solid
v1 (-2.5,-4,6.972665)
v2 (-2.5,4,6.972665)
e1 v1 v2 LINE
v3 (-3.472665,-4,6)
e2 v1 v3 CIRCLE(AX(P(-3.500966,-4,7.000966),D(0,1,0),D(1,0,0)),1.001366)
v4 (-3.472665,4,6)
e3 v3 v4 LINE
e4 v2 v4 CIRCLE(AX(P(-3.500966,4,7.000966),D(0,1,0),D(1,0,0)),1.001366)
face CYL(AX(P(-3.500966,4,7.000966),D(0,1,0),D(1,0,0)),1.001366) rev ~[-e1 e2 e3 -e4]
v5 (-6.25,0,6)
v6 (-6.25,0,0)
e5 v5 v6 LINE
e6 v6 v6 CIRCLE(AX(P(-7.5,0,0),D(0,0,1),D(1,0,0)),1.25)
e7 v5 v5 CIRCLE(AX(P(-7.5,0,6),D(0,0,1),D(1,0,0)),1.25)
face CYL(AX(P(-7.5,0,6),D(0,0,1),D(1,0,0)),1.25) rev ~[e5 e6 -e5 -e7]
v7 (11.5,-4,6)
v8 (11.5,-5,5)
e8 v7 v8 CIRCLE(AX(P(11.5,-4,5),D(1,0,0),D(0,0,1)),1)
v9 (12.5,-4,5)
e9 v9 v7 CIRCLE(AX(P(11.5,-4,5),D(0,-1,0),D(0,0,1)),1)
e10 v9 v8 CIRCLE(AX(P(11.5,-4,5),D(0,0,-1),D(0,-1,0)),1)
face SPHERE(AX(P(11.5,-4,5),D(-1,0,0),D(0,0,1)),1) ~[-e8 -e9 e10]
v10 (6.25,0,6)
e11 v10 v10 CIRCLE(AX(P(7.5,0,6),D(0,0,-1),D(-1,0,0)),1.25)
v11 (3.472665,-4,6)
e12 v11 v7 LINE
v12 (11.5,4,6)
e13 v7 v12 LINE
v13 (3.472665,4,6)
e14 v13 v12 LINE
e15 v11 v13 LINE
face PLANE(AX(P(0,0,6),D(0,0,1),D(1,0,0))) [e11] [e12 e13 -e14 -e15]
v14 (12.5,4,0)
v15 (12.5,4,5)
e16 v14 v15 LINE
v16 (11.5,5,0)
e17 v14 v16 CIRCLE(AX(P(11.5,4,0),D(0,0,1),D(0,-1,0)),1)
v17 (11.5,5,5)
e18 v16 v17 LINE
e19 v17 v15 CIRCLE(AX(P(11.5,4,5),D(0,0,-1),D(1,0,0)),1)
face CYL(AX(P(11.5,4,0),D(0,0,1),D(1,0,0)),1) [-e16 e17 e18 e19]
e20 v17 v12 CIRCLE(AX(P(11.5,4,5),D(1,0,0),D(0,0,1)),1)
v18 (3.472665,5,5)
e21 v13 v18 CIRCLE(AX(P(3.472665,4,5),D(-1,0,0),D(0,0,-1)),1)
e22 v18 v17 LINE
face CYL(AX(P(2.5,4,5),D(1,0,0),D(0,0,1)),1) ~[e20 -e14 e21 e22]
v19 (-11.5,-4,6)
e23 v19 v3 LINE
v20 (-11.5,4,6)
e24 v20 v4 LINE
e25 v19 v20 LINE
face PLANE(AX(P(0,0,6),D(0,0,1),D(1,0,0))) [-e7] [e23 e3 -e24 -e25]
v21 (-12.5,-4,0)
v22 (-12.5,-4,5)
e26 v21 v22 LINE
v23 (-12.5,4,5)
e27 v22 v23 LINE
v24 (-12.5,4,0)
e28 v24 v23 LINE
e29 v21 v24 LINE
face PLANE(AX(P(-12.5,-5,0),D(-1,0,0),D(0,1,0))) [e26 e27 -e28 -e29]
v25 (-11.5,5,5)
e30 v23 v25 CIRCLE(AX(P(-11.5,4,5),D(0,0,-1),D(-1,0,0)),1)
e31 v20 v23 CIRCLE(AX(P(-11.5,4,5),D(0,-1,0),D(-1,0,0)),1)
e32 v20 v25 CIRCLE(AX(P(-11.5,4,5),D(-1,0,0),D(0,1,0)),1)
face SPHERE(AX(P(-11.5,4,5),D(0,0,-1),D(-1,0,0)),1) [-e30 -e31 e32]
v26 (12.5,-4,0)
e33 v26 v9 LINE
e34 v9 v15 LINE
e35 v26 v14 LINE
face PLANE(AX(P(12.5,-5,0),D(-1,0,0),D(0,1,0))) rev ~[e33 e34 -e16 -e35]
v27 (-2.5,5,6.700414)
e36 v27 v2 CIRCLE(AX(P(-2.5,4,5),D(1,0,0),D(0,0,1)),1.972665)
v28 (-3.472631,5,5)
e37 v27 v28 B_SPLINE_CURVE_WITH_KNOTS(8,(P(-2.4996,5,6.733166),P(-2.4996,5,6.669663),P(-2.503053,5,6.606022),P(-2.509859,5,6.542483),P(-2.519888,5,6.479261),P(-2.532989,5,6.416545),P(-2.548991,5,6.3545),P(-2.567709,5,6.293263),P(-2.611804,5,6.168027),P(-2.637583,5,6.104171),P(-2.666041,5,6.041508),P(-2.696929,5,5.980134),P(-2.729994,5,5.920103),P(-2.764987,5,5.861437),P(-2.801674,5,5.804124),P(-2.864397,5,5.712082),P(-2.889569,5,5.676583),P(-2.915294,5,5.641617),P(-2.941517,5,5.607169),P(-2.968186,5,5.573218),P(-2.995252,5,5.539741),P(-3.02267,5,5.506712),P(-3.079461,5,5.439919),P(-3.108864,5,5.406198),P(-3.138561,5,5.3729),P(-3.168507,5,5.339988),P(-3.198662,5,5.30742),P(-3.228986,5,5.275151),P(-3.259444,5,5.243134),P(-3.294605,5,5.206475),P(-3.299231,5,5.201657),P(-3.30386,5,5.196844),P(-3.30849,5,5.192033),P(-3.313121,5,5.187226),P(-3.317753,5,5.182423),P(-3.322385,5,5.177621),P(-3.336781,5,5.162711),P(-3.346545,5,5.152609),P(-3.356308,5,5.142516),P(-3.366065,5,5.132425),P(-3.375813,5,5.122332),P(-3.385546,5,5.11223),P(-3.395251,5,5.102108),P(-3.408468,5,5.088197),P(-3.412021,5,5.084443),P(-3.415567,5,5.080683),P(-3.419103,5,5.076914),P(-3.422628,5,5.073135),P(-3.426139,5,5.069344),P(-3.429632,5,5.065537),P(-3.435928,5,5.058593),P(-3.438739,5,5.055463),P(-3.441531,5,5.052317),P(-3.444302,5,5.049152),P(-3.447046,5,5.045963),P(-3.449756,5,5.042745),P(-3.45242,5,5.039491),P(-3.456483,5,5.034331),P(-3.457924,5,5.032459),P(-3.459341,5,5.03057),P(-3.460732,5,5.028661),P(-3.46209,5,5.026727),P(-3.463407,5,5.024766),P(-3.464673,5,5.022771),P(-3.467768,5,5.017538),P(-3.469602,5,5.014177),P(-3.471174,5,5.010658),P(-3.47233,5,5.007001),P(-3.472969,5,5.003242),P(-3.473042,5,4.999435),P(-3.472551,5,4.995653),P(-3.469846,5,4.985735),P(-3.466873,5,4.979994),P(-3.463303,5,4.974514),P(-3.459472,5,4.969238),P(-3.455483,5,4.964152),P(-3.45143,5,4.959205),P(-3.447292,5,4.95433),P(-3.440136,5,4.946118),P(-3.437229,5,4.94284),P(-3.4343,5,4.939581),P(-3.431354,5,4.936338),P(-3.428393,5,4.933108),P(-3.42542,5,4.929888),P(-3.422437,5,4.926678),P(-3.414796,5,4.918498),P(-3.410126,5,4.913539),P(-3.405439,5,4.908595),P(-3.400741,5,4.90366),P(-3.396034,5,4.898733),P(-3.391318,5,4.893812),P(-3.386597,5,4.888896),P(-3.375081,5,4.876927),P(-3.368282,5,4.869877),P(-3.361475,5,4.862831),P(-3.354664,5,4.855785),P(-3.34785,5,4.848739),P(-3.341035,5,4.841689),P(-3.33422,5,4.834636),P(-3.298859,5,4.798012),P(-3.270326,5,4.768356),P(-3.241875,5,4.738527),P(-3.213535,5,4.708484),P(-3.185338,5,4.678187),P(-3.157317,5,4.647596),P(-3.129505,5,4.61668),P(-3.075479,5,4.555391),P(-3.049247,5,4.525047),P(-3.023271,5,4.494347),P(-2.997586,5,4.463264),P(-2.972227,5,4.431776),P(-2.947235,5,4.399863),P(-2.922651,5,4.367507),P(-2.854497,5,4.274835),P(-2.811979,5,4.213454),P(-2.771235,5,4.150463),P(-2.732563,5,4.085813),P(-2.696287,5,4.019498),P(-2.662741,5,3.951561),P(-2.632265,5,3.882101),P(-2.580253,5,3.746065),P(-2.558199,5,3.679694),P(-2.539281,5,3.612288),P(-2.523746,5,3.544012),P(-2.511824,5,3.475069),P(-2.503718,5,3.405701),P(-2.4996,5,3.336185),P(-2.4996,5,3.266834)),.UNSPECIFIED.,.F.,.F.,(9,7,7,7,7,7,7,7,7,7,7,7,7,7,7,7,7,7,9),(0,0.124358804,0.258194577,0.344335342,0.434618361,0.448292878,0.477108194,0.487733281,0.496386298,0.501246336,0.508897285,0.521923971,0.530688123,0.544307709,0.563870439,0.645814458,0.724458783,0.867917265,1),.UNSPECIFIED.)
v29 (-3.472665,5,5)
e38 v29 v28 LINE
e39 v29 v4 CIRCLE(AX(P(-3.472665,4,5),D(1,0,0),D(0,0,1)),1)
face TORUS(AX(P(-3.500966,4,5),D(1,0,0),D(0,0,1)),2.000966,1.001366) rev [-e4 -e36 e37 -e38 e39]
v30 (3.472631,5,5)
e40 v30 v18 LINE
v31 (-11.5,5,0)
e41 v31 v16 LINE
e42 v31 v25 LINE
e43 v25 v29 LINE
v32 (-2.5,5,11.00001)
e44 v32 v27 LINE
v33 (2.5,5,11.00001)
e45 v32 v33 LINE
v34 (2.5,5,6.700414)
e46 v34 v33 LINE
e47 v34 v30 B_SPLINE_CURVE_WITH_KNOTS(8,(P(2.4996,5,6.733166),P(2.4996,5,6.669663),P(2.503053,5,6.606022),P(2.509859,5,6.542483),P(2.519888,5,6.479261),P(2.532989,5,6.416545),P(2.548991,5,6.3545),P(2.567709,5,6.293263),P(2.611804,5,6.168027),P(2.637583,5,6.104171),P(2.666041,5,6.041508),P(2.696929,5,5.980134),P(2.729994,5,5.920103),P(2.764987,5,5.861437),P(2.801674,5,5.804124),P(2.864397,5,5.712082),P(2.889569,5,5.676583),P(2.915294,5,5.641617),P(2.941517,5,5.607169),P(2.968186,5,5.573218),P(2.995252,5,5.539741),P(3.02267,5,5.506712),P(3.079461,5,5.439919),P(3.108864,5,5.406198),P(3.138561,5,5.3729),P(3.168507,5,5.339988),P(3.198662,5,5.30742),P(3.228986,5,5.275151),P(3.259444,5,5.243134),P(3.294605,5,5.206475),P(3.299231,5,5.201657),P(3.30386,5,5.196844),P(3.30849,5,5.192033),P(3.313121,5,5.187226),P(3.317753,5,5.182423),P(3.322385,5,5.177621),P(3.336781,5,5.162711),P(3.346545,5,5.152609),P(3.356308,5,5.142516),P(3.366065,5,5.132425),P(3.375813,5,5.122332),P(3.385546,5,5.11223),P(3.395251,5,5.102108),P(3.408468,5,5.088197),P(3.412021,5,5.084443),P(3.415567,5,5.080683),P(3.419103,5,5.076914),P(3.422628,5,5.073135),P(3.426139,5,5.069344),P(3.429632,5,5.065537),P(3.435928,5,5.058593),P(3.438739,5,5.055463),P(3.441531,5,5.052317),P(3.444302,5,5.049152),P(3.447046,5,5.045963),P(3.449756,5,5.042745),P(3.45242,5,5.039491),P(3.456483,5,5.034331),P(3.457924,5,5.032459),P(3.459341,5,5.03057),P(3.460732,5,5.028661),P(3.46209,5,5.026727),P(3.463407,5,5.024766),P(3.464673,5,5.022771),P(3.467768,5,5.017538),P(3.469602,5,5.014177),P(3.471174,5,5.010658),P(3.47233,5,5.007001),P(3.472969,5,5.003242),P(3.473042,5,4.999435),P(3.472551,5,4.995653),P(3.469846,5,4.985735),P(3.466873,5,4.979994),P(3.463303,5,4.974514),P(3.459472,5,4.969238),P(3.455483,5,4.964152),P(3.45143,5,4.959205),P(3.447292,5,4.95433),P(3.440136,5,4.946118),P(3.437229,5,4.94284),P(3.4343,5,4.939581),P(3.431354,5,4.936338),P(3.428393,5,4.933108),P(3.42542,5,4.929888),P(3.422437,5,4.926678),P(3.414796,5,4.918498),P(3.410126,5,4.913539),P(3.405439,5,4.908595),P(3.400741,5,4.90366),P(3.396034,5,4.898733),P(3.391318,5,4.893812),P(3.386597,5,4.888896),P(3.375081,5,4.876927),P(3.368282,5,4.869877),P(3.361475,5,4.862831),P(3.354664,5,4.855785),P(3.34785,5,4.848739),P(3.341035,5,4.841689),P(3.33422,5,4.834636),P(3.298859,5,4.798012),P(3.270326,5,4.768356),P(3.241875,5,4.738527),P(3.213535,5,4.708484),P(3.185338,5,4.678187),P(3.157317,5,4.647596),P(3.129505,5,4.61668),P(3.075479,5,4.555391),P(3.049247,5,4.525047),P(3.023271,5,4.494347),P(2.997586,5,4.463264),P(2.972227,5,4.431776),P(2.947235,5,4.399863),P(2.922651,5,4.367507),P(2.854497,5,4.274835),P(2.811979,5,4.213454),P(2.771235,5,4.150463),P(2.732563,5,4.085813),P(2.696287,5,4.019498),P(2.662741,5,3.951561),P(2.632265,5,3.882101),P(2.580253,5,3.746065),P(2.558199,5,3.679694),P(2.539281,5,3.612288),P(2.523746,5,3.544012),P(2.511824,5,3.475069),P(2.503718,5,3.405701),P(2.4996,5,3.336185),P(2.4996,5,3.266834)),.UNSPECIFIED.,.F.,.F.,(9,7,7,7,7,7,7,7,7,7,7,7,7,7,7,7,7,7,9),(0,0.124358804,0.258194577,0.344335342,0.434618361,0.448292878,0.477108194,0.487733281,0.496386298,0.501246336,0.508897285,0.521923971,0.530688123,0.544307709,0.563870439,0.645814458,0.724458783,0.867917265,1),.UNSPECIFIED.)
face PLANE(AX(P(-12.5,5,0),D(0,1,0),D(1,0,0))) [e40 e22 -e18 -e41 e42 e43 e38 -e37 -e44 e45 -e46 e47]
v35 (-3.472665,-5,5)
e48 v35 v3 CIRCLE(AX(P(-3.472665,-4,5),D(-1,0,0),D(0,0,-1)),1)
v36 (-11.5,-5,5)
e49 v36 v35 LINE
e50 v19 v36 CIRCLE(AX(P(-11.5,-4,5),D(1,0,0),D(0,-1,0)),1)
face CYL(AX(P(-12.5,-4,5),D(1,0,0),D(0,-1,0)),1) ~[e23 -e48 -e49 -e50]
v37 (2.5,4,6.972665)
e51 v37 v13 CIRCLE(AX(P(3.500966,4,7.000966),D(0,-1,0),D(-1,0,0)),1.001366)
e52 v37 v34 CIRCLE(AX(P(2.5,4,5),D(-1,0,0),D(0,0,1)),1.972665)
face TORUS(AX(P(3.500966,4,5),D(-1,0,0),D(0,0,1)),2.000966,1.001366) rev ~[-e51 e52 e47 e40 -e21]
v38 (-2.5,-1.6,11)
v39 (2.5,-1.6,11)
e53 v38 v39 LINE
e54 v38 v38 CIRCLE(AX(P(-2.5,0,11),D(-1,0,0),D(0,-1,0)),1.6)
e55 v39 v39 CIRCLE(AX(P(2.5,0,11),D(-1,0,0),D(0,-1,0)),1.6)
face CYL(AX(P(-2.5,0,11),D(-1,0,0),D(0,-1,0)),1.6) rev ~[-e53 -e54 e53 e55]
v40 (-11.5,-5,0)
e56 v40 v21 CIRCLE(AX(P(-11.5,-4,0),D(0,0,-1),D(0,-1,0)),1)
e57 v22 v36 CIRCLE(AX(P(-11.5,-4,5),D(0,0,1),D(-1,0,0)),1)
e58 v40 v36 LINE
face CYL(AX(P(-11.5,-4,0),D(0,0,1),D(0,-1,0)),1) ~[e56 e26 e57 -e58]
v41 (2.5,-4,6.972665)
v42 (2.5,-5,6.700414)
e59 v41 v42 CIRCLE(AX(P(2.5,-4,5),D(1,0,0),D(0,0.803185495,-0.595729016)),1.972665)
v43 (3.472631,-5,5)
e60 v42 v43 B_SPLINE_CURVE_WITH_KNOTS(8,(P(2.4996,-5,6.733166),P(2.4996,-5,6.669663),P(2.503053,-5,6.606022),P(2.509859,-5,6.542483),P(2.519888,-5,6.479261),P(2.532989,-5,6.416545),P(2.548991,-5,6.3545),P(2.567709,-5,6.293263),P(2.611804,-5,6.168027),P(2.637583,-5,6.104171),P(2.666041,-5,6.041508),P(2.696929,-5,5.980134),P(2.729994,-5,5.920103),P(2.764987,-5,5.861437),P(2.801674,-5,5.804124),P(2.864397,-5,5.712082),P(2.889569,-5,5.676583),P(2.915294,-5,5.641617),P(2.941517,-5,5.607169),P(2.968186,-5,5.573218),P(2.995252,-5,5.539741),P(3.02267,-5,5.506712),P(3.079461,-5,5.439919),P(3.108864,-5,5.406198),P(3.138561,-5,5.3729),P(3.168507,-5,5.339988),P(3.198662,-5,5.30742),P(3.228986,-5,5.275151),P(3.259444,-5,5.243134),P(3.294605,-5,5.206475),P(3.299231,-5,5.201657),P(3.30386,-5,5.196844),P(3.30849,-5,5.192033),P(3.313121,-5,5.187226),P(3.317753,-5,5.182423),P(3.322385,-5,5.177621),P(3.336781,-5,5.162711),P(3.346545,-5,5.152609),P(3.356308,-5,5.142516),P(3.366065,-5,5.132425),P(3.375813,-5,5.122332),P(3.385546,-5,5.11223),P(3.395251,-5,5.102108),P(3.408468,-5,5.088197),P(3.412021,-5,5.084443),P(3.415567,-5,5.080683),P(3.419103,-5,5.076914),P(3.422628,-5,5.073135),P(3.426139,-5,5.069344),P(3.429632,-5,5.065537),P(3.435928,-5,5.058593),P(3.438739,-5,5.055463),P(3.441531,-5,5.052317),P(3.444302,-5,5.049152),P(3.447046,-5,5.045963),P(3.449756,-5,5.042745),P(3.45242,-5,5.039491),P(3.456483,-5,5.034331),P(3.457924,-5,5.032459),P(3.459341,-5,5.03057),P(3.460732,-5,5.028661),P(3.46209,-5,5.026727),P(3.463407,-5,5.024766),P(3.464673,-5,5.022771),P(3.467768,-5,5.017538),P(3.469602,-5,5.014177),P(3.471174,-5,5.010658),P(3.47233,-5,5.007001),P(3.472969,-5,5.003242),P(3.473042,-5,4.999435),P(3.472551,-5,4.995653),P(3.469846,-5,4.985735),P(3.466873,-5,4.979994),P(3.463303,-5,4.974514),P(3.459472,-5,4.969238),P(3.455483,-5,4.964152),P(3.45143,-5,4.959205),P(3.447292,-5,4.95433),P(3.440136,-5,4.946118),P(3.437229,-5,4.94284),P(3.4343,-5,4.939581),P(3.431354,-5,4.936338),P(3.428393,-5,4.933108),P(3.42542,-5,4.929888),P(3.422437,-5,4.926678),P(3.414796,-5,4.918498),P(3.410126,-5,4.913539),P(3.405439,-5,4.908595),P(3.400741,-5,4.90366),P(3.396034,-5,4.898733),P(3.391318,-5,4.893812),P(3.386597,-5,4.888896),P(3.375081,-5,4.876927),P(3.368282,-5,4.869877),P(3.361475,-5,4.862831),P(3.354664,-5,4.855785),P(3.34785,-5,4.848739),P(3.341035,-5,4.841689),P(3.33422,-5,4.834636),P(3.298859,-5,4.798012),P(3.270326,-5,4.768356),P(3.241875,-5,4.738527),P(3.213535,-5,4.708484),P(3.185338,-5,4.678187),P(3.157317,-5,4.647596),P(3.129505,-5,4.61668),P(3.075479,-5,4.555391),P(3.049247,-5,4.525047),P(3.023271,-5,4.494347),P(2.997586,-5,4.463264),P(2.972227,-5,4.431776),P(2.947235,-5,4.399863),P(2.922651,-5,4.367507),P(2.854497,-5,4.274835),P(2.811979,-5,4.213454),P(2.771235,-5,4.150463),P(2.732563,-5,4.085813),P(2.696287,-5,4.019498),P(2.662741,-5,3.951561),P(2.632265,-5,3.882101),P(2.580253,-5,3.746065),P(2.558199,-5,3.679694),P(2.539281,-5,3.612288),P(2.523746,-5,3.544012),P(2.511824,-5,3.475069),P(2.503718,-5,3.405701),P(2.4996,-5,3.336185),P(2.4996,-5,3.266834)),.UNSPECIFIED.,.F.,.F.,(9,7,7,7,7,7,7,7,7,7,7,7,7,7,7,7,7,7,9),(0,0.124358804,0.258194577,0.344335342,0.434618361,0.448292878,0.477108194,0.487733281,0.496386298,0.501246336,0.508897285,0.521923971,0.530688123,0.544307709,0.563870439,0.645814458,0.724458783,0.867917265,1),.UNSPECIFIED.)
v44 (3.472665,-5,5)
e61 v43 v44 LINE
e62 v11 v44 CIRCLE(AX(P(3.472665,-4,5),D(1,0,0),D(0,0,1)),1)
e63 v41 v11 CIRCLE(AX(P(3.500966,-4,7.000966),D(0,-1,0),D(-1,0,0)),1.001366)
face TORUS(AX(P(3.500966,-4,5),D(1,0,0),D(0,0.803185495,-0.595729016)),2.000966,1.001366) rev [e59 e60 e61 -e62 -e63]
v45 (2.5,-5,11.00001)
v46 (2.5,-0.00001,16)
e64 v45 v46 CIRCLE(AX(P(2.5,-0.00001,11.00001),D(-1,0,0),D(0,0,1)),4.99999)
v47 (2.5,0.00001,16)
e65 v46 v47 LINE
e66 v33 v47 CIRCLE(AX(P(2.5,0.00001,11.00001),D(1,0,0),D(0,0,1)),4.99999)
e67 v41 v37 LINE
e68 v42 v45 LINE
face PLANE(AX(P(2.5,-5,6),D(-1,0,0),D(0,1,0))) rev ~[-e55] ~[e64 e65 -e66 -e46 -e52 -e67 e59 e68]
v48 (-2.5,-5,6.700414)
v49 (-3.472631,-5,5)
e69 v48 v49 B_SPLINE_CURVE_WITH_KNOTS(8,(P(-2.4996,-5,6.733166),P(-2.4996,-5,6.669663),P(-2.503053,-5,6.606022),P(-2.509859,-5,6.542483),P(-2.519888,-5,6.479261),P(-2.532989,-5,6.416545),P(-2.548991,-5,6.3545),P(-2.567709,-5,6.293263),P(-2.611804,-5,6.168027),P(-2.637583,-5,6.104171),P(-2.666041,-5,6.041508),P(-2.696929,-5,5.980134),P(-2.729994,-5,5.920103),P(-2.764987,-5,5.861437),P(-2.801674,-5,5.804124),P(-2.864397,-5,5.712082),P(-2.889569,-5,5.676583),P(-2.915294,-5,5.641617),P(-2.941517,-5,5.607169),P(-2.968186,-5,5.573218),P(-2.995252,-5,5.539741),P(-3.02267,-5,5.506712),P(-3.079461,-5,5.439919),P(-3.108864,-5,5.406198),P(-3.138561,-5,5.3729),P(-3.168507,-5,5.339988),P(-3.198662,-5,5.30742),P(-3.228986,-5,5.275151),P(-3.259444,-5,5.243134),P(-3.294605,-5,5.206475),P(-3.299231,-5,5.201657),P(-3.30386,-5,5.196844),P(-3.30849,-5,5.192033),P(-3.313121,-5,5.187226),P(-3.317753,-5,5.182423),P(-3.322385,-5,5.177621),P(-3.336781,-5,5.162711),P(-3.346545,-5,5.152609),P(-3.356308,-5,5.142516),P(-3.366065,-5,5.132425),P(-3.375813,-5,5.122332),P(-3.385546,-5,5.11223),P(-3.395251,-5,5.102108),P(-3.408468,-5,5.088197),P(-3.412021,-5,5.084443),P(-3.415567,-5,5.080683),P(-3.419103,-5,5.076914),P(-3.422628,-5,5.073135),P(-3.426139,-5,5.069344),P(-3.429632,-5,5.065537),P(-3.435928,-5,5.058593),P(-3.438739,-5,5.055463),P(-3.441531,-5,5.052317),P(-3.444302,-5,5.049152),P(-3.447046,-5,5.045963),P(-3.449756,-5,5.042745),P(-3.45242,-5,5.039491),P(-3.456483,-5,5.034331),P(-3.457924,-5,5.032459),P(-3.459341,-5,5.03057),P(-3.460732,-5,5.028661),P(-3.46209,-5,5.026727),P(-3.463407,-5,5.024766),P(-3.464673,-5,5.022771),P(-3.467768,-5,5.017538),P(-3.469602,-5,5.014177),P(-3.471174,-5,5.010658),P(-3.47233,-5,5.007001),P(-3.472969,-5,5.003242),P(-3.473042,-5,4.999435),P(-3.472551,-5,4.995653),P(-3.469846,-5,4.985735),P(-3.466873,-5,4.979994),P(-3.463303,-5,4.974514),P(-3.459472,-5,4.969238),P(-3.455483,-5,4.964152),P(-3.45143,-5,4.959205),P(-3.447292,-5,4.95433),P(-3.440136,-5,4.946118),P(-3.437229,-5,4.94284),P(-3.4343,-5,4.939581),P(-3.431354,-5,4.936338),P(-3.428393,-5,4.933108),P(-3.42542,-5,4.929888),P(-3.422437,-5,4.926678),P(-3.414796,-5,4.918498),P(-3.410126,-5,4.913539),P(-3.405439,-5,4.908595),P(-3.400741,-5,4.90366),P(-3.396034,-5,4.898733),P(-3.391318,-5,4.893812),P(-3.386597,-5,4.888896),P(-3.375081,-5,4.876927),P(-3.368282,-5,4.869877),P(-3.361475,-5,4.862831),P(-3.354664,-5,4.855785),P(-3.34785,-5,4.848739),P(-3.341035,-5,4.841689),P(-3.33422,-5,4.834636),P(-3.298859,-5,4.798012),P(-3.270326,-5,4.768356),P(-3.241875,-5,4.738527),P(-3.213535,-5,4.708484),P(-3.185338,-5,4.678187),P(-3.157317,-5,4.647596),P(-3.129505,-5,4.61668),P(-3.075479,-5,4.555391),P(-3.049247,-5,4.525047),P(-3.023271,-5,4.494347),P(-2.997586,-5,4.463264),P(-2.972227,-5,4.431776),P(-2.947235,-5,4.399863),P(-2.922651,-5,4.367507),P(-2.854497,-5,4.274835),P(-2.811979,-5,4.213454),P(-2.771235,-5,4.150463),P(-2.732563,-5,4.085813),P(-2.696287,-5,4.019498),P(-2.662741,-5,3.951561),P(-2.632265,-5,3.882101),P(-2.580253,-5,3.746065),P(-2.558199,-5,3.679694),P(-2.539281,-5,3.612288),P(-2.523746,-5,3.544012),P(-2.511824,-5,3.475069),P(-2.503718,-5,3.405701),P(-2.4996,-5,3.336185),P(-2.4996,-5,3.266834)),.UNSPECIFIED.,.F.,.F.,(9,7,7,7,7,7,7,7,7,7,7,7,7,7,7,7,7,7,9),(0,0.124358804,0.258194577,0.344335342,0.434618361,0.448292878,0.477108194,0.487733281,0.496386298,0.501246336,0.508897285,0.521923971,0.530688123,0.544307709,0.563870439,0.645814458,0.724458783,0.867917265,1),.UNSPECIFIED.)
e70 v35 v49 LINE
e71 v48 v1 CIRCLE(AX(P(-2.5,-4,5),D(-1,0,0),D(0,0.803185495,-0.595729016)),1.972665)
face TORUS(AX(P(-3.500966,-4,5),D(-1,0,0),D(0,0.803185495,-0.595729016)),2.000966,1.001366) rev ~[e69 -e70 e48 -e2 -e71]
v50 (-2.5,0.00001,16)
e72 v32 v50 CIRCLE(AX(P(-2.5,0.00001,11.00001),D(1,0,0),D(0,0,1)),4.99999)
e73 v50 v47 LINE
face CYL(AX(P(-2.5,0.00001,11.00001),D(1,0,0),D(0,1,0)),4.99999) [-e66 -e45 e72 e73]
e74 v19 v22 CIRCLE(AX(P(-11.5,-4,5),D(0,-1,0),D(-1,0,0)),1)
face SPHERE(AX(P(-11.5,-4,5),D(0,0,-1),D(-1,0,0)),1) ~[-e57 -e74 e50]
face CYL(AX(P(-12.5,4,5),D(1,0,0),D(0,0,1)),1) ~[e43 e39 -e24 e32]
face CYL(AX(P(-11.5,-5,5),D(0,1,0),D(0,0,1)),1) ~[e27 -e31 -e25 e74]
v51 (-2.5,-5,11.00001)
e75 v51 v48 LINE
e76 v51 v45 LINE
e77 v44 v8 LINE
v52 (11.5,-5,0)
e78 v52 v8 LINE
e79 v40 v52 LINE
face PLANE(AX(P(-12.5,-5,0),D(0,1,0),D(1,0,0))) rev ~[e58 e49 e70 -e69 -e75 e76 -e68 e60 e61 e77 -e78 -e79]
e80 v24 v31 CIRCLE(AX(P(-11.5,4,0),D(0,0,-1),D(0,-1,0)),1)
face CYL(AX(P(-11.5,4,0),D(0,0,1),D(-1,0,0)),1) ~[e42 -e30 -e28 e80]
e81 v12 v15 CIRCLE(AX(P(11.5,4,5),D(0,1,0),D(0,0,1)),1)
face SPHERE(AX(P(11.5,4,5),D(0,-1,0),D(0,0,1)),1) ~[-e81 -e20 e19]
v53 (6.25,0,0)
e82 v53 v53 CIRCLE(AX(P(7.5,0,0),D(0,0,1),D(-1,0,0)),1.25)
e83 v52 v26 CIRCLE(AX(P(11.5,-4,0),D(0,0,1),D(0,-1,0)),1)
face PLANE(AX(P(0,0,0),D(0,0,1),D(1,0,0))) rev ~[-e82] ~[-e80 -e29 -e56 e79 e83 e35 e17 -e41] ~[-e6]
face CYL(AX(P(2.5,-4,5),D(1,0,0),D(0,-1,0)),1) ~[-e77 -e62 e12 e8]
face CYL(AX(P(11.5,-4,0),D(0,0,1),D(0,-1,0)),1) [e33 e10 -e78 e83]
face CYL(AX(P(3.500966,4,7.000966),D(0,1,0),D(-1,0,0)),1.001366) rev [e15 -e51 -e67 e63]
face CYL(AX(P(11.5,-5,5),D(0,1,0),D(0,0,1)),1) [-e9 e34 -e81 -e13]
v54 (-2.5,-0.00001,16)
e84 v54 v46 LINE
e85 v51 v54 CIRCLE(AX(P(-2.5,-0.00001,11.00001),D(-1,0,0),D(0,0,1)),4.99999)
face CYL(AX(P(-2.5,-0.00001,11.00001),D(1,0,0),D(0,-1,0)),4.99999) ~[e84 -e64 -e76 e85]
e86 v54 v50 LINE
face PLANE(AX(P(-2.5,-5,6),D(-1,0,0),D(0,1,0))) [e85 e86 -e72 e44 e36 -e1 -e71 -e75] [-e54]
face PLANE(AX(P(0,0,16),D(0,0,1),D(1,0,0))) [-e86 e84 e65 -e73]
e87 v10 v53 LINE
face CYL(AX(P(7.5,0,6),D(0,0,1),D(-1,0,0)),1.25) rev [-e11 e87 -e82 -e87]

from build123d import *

# Parameters (mm, degrees)
F0_W          = 25
F0_H          = 10
F1_DEPTH      = 6
F2_W          = 5
F2_H          = 10
F3_DEPTH      = 10
F4_R          = 1.25
F5_DEPTH      = 6.001
F6_R          = 4.99999
F7_R          = 1.6
F8_DEPTH      = 15.001
F9_R          = 1
F10_T1_DEPTH  = 8
F10_T6_ANGLE  = 233.435380504
F10_T11_ANGLE = 233.435380504
F10_T16_ANGLE = 233.435380504
F10_T21_ANGLE = 233.435380504


# Not quite as in the source:
# - a fillet or chamfer that OpenCascade refuses, or shapes differently, is made with other operations: its cross-section is extruded or revolved along the edge and cut away or added
# - a fillet or chamfer is up to 0.001 mm smaller than in the source, because OpenCascade refuses the exact size
# - a pattern or mirror of a feature is missing from the dataset's text; its kind, count and spacing are read off the source's solid


with BuildPart() as f1:
    # F0 (on Top) → F1 (new body)
    with BuildSketch(Plane.XY):
        Rectangle(F0_W, F0_H)
    extrude(amount=F1_DEPTH)

    # F2 (on face) → F3 (join)
    with BuildSketch(Plane.XY.offset(6)):
        Rectangle(F2_W, F2_H)
    extrude(amount=F3_DEPTH)

    # F4 (on face) → F5 (cut, through all)
    with BuildSketch(Plane.XY.offset(6)):
        with Locations((-7.5, 0)):
            Circle(F4_R)
    f5 = extrude(amount=-F5_DEPTH, mode=Mode.SUBTRACT)

    # F5_copies: F5 across plane
    add(f5.mirror(Plane(origin=(0, 0, 0), x_dir=(0, 0, 1), z_dir=(1, 0, 0))), mode=Mode.SUBTRACT)

    # F6 (radius 5 in the source; OpenCascade refuses exactly that, so slightly less here)
    f6_edges = [f1.edges().sort_by_distance(p)[0] for p in [
        (0, -5, 16),
        (0, 5, 16),
    ]]
    fillet(f6_edges, radius=F6_R)

    # F7 (on face) → F8 (cut, through all)
    with BuildSketch(Plane(origin=(-2.5, 0, 0), x_dir=(0, -1, 0), z_dir=(-1, 0, 0))):
        with Locations((0, 11)):
            Circle(F7_R)
    extrude(amount=-F8_DEPTH, mode=Mode.SUBTRACT)

    # F9
    f9_edges = [f1.edges().sort_by_distance(p)[0] for p in [
        (7.5, -5, 6),
        (12.5, 0, 6),
        (7.5, 5, 6),
        (12.5, -5, 3),
        (12.5, 5, 3),
        (-12.5, -5, 3),
        (-12.5, 5, 3),
        (-12.5, 0, 6),
        (-7.5, -5, 6),
        (-7.5, 5, 6),
    ]]
    fillet(f9_edges, radius=F9_R)

    # F10: fillet of radius 1 on 2 edges, made by hand

    # F10_s2 → F10_t1 (join)
    with BuildSketch(Plane.XZ.offset(-4)):
        with BuildLine():
            ThreePointArc((2.4996, 7.0009656854), (2.7928932188, 6.2928932188), (3.5009656854, 5.9996))
            Line((3.5009656854, 5.9996), (3.5009656854, 5.8994634315))
            ThreePointArc((3.5009656854, 5.8994634315), (3.0004828427, 5.8998634315), (2.5, 5.8998634315))
            Line((2.5, 5.8998634315), (2.3998634315, 6))
            ThreePointArc((2.3998634315, 6), (2.3998634315, 6.5004828427), (2.3994634315, 7.0009656854))
            Line((2.3994634315, 7.0009656854), (2.4996, 7.0009656854))
        make_face()
        with BuildLine():
            ThreePointArc((-2.4996, 7.0009656854), (-2.7928932188, 6.2928932188), (-3.5009656854, 5.9996))
            Line((-3.5009656854, 5.9996), (-3.5009656854, 5.8994634315))
            ThreePointArc((-3.5009656854, 5.8994634315), (-3.0004828427, 5.8998634315), (-2.5, 5.8998634315))
            Line((-2.5, 5.8998634315), (-2.3998634315, 6))
            ThreePointArc((-2.3998634315, 6), (-2.3998634315, 6.5004828427), (-2.3994634315, 7.0009656854))
            Line((-2.3994634315, 7.0009656854), (-2.4996, 7.0009656854))
        make_face()
    extrude(amount=F10_T1_DEPTH)


with BuildPart() as f10_tool4:
    # F10_s5 → F10_t6 (revolve)
    with BuildSketch(Plane.XZ.offset(-4)):
        with BuildLine():
            ThreePointArc((-2.4996, 7.0009656854), (-2.7928932188, 6.2928932188), (-3.5009656854, 5.9996))
            Line((-3.5009656854, 5.9996), (-3.5009656854, 5.8994634315))
            ThreePointArc((-3.5009656854, 5.8994634315), (-3.0004828427, 5.8998634315), (-2.5, 5.8998634315))
            Line((-2.5, 5.8998634315), (-2.3998634315, 6))
            ThreePointArc((-2.3998634315, 6), (-2.3998634315, 6.5004828427), (-2.3994634315, 7.0009656854))
            Line((-2.3994634315, 7.0009656854), (-2.4996, 7.0009656854))
        make_face()
    revolve(axis=Axis((-2.5, 4, 5), (-1, 0, 0)), revolution_arc=F10_T6_ANGLE)

    split(bisect_by=Plane.XZ.offset(-5), keep=Keep.TOP)


with BuildPart() as f1_1:
    add(f1.part)

    # F10_t3: union F10_tool4
    add(f10_tool4.part)


with BuildPart() as f10_tool9:
    # F10_s10 → F10_t11 (revolve)
    with BuildSketch(Plane(origin=(0, 0.9728322798, 1.3116110753), x_dir=(1, 0, 0), z_dir=(0, 0.5957290165, 0.8031854947))):
        with BuildLine():
            ThreePointArc((-3.5009656854, -5.1917870613), (-2.7928932188, -4.8984938425), (-2.4996, -4.1904213759))
            Line((-2.4996, -4.1904213759), (-2.3994634315, -4.1904213759))
            ThreePointArc((-2.3994634315, -4.1904213759), (-2.3998634315, -4.6909042186), (-2.3998634315, -5.1913870613))
            Line((-2.3998634315, -5.1913870613), (-2.5, -5.2915236298))
            ThreePointArc((-2.5, -5.2915236298), (-3.0004828427, -5.2915236298), (-3.5009656854, -5.2919236298))
            Line((-3.5009656854, -5.2919236298), (-3.5009656854, -5.1917870613))
        make_face()
    revolve(axis=Axis((-2.5, -4, 5), (-1, 0, 0)), revolution_arc=F10_T11_ANGLE)

    split(bisect_by=Plane.XZ.offset(5), keep=Keep.BOTTOM)


with BuildPart() as f1_2:
    add(f1_1.part)

    # F10_t8: union F10_tool9
    add(f10_tool9.part)


with BuildPart() as f10_tool14:
    # F10_s15 → F10_t16 (revolve)
    with BuildSketch(Plane(origin=(0, 0.9728322798, 1.3116110753), x_dir=(1, 0, 0), z_dir=(0, 0.5957290165, 0.8031854947))):
        with BuildLine():
            ThreePointArc((3.5009656854, -5.1917870613), (2.7928932188, -4.8984938425), (2.4996, -4.1904213759))
            Line((2.4996, -4.1904213759), (2.3994634315, -4.1904213759))
            ThreePointArc((2.3994634315, -4.1904213759), (2.3998634315, -4.6909042186), (2.3998634315, -5.1913870613))
            Line((2.3998634315, -5.1913870613), (2.5, -5.2915236298))
            ThreePointArc((2.5, -5.2915236298), (3.0004828427, -5.2915236298), (3.5009656854, -5.2919236298))
            Line((3.5009656854, -5.2919236298), (3.5009656854, -5.1917870613))
        make_face()
    revolve(axis=Axis((2.5, -4, 5), (-1, 0, 0)), revolution_arc=F10_T16_ANGLE)

    split(bisect_by=Plane.XZ.offset(5), keep=Keep.BOTTOM)


with BuildPart() as f1_3:
    add(f1_2.part)

    # F10_t13: union F10_tool14
    add(f10_tool14.part)


with BuildPart() as f10_tool19:
    # F10_s20 → F10_t21 (revolve)
    with BuildSketch(Plane.XZ.offset(-4)):
        with BuildLine():
            ThreePointArc((2.4996, 7.0009656854), (2.7928932188, 6.2928932188), (3.5009656854, 5.9996))
            Line((3.5009656854, 5.9996), (3.5009656854, 5.8994634315))
            ThreePointArc((3.5009656854, 5.8994634315), (3.0004828427, 5.8998634315), (2.5, 5.8998634315))
            Line((2.5, 5.8998634315), (2.3998634315, 6))
            ThreePointArc((2.3998634315, 6), (2.3998634315, 6.5004828427), (2.3994634315, 7.0009656854))
            Line((2.3994634315, 7.0009656854), (2.4996, 7.0009656854))
        make_face()
    revolve(axis=Axis((2.5, 4, 5), (-1, 0, 0)), revolution_arc=F10_T21_ANGLE)

    split(bisect_by=Plane.XZ.offset(-5), keep=Keep.TOP)


with BuildPart() as f1_4:
    add(f1_3.part)

    # F10_t18: union F10_tool19
    add(f10_tool19.part)


solid = f1_4.part
